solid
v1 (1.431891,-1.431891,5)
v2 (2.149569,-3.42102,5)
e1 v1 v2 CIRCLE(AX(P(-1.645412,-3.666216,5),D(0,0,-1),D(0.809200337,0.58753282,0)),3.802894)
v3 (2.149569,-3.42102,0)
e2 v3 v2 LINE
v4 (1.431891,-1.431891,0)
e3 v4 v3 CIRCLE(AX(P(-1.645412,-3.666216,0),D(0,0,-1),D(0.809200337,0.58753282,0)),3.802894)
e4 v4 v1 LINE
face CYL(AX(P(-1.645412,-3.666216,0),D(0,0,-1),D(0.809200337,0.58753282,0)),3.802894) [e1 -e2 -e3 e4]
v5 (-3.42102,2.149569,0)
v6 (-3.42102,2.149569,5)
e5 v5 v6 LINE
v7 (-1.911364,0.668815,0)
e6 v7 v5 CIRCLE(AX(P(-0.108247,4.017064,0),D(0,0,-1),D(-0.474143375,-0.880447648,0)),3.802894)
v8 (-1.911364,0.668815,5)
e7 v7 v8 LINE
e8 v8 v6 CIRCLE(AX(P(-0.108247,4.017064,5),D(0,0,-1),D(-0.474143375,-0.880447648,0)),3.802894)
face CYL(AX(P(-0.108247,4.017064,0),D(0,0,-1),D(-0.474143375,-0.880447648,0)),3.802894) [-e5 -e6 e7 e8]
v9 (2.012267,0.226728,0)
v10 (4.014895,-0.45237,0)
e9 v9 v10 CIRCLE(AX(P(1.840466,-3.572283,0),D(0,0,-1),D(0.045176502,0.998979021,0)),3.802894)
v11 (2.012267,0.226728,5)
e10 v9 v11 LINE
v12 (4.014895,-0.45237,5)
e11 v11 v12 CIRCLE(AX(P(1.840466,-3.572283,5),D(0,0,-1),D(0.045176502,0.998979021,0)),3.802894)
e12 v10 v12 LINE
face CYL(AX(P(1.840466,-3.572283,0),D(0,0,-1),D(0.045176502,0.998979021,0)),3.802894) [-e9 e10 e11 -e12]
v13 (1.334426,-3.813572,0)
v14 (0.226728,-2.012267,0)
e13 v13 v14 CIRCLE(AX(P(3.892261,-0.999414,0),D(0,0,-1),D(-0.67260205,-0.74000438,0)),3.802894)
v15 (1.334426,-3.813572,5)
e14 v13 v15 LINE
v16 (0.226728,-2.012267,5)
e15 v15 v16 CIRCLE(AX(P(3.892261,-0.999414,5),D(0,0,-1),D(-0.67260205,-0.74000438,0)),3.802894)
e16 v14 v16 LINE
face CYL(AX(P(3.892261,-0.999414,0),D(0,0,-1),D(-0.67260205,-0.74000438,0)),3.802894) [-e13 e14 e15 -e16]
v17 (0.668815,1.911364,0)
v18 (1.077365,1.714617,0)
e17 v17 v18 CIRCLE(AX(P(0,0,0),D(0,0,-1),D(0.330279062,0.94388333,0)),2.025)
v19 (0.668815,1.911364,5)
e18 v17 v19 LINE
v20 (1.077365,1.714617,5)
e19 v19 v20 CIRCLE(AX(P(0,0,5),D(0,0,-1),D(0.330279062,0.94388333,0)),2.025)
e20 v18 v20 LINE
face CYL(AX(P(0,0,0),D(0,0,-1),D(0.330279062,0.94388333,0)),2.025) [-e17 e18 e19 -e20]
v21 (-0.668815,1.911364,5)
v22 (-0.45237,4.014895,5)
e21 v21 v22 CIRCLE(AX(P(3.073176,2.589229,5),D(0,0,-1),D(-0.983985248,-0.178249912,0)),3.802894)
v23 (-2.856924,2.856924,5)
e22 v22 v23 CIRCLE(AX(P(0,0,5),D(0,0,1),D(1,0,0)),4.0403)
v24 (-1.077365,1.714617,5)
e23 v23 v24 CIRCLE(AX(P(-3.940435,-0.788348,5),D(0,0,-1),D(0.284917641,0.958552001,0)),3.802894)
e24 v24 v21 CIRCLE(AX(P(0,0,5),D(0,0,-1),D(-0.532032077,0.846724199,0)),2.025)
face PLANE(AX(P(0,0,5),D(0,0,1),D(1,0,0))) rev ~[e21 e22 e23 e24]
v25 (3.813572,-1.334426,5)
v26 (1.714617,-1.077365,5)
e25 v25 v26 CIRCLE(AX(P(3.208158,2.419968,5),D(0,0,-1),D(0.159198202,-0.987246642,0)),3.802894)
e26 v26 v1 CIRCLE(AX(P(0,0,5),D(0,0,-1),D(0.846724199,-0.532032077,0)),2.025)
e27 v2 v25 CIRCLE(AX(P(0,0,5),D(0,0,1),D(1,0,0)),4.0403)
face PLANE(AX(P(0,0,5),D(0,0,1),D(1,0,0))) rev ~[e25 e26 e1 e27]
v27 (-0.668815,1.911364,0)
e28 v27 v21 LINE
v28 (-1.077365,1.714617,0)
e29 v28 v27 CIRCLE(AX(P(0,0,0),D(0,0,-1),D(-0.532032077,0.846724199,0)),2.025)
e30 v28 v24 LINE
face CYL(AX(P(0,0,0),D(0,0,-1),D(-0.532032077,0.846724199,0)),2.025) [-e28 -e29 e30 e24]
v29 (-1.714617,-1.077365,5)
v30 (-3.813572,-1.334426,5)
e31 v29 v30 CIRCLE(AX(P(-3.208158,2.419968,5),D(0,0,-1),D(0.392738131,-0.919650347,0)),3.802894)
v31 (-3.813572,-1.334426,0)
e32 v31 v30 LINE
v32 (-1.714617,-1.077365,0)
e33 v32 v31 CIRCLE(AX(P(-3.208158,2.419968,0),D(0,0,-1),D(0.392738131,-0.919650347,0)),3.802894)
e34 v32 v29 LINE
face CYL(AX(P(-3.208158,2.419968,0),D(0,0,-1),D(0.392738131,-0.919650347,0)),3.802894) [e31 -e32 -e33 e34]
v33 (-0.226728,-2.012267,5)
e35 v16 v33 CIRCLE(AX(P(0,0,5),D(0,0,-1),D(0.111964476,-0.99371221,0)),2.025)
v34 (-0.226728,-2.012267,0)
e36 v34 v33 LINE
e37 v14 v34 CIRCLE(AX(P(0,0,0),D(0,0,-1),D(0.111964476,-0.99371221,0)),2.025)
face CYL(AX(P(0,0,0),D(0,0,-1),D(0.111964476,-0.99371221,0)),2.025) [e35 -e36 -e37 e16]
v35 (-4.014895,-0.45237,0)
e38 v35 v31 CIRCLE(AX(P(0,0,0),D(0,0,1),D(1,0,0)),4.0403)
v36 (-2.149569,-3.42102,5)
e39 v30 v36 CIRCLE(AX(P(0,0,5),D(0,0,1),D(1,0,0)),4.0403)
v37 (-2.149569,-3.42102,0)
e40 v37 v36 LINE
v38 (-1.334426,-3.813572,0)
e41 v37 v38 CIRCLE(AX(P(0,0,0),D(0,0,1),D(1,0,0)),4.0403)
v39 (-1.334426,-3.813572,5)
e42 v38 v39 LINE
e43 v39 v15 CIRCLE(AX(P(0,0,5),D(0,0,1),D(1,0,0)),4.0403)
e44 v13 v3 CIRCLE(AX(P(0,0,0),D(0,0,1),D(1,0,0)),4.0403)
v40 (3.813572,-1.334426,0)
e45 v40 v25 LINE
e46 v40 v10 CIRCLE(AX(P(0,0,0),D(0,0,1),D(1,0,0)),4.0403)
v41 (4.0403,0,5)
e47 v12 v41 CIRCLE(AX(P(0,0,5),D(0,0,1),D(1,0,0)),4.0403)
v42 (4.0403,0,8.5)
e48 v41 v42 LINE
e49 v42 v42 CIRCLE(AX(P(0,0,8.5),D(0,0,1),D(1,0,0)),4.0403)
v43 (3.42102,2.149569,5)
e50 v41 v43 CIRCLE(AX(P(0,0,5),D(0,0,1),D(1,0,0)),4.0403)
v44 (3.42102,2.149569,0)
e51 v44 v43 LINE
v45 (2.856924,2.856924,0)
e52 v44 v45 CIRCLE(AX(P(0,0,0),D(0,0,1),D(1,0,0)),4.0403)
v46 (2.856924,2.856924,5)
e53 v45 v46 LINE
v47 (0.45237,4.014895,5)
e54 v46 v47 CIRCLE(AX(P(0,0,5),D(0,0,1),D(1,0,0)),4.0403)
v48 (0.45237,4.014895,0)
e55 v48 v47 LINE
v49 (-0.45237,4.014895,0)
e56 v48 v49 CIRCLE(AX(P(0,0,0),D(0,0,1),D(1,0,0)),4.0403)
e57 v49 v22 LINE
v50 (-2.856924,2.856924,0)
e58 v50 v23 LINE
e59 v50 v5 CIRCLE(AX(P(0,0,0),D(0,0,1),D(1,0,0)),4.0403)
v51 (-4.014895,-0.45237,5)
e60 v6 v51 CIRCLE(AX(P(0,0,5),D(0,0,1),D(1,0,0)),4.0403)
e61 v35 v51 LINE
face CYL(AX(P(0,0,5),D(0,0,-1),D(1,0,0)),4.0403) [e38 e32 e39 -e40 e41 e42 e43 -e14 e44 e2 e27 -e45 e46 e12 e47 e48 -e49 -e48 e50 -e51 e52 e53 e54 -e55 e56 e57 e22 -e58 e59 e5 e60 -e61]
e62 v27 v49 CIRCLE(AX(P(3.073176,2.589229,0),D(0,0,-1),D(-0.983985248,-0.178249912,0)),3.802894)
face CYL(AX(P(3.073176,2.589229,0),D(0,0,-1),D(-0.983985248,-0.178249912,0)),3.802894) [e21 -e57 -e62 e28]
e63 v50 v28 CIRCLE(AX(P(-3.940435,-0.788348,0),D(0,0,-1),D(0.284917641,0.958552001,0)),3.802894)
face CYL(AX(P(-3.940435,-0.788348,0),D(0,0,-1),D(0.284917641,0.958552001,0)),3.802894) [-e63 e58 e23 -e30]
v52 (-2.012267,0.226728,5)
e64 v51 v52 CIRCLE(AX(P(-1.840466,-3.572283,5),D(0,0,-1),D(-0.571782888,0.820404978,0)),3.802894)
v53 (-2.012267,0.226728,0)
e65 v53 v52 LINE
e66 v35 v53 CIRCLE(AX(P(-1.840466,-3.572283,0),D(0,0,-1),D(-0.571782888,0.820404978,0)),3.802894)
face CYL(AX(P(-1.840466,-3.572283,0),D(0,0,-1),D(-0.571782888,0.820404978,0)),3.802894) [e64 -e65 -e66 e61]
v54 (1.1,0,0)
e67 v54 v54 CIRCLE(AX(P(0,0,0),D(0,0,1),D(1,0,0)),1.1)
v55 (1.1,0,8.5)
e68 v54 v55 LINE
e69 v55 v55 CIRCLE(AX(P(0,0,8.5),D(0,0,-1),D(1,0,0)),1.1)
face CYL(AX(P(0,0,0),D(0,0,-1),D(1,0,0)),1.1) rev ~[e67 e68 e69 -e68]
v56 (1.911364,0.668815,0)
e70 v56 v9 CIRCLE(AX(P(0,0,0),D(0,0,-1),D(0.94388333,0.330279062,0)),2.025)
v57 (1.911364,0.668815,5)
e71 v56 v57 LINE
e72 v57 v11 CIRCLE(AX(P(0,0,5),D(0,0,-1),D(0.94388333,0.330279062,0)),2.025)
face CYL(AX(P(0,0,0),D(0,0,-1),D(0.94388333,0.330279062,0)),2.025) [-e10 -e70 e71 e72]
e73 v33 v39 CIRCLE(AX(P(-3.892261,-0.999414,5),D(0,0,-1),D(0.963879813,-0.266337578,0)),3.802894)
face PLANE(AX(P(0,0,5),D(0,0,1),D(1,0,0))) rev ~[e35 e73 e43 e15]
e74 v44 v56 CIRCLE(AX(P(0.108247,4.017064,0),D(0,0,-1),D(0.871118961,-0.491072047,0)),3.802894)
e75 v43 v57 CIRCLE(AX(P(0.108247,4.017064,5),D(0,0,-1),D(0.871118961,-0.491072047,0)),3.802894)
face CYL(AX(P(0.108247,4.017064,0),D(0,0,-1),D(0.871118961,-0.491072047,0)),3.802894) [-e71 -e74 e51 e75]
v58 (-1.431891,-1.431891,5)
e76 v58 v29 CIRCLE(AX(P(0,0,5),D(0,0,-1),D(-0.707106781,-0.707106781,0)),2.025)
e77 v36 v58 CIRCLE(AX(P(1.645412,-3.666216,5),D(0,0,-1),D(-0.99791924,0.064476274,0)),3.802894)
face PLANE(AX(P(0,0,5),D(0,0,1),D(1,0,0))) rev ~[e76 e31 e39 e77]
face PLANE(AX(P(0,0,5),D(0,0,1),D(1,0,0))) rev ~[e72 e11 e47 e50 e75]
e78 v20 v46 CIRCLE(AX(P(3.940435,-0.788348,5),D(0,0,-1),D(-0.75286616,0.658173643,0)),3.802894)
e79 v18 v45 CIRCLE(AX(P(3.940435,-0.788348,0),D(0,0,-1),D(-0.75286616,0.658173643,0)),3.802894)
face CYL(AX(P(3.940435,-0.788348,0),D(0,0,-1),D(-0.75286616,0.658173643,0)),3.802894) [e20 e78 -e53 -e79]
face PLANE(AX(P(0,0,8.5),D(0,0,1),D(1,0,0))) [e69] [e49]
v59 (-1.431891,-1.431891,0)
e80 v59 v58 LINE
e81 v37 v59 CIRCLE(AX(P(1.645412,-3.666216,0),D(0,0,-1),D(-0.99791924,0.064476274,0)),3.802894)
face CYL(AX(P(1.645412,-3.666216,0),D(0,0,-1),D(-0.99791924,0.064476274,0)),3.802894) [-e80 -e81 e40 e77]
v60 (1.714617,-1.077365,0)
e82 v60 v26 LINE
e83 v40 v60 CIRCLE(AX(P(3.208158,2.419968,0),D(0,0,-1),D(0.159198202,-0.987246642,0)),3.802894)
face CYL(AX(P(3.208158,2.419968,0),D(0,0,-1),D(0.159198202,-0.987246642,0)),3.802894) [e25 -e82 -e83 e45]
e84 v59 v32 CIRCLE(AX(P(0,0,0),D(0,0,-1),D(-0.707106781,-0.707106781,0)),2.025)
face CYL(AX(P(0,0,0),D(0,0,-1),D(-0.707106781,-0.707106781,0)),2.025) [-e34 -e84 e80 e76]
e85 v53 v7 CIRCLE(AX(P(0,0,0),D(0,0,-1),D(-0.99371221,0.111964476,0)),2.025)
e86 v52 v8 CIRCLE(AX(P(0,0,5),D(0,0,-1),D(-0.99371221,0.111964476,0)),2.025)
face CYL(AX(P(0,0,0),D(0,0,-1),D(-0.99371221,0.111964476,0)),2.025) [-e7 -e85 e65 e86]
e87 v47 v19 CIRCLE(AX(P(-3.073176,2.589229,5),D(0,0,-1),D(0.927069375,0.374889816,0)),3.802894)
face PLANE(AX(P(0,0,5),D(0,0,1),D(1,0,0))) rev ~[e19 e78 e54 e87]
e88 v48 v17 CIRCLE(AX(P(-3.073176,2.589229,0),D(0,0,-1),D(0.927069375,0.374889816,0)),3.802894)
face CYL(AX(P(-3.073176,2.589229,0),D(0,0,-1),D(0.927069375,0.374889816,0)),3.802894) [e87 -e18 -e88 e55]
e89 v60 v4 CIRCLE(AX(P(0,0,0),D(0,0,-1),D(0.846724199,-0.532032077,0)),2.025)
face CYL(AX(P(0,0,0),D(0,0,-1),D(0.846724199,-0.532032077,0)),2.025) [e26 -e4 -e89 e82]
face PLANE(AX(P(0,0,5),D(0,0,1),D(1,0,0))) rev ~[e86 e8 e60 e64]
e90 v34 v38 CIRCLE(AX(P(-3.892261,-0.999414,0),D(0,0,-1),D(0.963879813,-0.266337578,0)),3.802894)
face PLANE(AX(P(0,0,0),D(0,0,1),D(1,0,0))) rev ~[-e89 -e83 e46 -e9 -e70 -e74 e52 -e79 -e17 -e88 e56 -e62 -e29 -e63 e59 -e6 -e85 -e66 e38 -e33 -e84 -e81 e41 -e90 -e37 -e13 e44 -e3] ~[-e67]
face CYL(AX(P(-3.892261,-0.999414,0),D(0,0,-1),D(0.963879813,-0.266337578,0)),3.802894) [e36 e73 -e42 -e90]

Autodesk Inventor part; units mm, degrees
sketch "Sketch1" plane through (0, 0, 0) normal (0, 0, 1) x (1, 0, 0)
  circle A0 centre (0, 0) radius 4.0403
  dimension "d0" = 8.0806
extrude "Extrusion1" add sketch "Sketch1" along normal blind 5
ref_plane "Work Plane2" through (0, 0, 2.5) normal (0, 0, 1) x (1, 0, 0)
sketch "Sketch2" plane through (0, 0, 0) normal (0, 0, -1) x (-1, 0, 0)
  circle A0 centre (0, 0) radius 4.0403 projected
  circle A1 centre (0, 0) radius 3.15
  dimension "d3" = 6.3
surface extrude "ピッチ円直径" sketch "Sketch2" against normal through all shown no curves A1
ref_plane "Work Plane8" through (0, 0, 0) normal (0.9009689, 0.4338837, 0) x (0, 0, 1)
ref_plane "Work Plane9" through (0, 0, 0) normal (1, 0, 0) x (0, 1, 0)
spur gear teeth "平歯車" teeth 7 pitch diameter 6.3 tip diameter 8.0806 root diameter 4.05 face width 5 start plane through (0, 0, 0) normal (0, 0, -1) x (-1, 0, 0)
sketch "スケッチ3" plane through (0, 0, 5) normal (0, 0, 1) x (1, 0, 0)
  arc A0 (-0.6688, 1.9114) -> (-1.0774, 1.7146) centre (0, 0) ccw construction
  circle A1 centre (0, 0) radius 2.025
  circle A2 centre (0, 0) radius 1.1
  circle A3 centre (0, 0) radius 4.0403
  arc A4 (1.3344, -3.8136) -> (2.1496, -3.421) centre (0, 0) ccw construction
  dimension "d49" = 2.2
extrude "押し出し2" add sketch "スケッチ3" along normal blind 3.5 contours A1 | A2
extrude "押し出し3" cut sketch "スケッチ3" along normal blind 10 from surface at -5 contours A2
extrude "押し出し4" add sketch "スケッチ3" along normal up to surface (3.5 mm away) contours A3
equation "\"d0\" = da_da"
equation "\"d1\" = da_b"
equation "\"d3\" = da_d"
equation "\"d16\" = da_aw"
equation "\"d43\" = da_aw"
equation "\"d46\" = da_aw"
equation "\"da_da\" = 8.080619"
equation "\"da_b\" = 5"
equation "\"da_d\" = 6.3"
equation "\"da_aw\" = 13.23747"
properties part number "平歯車1" material "Steel"
